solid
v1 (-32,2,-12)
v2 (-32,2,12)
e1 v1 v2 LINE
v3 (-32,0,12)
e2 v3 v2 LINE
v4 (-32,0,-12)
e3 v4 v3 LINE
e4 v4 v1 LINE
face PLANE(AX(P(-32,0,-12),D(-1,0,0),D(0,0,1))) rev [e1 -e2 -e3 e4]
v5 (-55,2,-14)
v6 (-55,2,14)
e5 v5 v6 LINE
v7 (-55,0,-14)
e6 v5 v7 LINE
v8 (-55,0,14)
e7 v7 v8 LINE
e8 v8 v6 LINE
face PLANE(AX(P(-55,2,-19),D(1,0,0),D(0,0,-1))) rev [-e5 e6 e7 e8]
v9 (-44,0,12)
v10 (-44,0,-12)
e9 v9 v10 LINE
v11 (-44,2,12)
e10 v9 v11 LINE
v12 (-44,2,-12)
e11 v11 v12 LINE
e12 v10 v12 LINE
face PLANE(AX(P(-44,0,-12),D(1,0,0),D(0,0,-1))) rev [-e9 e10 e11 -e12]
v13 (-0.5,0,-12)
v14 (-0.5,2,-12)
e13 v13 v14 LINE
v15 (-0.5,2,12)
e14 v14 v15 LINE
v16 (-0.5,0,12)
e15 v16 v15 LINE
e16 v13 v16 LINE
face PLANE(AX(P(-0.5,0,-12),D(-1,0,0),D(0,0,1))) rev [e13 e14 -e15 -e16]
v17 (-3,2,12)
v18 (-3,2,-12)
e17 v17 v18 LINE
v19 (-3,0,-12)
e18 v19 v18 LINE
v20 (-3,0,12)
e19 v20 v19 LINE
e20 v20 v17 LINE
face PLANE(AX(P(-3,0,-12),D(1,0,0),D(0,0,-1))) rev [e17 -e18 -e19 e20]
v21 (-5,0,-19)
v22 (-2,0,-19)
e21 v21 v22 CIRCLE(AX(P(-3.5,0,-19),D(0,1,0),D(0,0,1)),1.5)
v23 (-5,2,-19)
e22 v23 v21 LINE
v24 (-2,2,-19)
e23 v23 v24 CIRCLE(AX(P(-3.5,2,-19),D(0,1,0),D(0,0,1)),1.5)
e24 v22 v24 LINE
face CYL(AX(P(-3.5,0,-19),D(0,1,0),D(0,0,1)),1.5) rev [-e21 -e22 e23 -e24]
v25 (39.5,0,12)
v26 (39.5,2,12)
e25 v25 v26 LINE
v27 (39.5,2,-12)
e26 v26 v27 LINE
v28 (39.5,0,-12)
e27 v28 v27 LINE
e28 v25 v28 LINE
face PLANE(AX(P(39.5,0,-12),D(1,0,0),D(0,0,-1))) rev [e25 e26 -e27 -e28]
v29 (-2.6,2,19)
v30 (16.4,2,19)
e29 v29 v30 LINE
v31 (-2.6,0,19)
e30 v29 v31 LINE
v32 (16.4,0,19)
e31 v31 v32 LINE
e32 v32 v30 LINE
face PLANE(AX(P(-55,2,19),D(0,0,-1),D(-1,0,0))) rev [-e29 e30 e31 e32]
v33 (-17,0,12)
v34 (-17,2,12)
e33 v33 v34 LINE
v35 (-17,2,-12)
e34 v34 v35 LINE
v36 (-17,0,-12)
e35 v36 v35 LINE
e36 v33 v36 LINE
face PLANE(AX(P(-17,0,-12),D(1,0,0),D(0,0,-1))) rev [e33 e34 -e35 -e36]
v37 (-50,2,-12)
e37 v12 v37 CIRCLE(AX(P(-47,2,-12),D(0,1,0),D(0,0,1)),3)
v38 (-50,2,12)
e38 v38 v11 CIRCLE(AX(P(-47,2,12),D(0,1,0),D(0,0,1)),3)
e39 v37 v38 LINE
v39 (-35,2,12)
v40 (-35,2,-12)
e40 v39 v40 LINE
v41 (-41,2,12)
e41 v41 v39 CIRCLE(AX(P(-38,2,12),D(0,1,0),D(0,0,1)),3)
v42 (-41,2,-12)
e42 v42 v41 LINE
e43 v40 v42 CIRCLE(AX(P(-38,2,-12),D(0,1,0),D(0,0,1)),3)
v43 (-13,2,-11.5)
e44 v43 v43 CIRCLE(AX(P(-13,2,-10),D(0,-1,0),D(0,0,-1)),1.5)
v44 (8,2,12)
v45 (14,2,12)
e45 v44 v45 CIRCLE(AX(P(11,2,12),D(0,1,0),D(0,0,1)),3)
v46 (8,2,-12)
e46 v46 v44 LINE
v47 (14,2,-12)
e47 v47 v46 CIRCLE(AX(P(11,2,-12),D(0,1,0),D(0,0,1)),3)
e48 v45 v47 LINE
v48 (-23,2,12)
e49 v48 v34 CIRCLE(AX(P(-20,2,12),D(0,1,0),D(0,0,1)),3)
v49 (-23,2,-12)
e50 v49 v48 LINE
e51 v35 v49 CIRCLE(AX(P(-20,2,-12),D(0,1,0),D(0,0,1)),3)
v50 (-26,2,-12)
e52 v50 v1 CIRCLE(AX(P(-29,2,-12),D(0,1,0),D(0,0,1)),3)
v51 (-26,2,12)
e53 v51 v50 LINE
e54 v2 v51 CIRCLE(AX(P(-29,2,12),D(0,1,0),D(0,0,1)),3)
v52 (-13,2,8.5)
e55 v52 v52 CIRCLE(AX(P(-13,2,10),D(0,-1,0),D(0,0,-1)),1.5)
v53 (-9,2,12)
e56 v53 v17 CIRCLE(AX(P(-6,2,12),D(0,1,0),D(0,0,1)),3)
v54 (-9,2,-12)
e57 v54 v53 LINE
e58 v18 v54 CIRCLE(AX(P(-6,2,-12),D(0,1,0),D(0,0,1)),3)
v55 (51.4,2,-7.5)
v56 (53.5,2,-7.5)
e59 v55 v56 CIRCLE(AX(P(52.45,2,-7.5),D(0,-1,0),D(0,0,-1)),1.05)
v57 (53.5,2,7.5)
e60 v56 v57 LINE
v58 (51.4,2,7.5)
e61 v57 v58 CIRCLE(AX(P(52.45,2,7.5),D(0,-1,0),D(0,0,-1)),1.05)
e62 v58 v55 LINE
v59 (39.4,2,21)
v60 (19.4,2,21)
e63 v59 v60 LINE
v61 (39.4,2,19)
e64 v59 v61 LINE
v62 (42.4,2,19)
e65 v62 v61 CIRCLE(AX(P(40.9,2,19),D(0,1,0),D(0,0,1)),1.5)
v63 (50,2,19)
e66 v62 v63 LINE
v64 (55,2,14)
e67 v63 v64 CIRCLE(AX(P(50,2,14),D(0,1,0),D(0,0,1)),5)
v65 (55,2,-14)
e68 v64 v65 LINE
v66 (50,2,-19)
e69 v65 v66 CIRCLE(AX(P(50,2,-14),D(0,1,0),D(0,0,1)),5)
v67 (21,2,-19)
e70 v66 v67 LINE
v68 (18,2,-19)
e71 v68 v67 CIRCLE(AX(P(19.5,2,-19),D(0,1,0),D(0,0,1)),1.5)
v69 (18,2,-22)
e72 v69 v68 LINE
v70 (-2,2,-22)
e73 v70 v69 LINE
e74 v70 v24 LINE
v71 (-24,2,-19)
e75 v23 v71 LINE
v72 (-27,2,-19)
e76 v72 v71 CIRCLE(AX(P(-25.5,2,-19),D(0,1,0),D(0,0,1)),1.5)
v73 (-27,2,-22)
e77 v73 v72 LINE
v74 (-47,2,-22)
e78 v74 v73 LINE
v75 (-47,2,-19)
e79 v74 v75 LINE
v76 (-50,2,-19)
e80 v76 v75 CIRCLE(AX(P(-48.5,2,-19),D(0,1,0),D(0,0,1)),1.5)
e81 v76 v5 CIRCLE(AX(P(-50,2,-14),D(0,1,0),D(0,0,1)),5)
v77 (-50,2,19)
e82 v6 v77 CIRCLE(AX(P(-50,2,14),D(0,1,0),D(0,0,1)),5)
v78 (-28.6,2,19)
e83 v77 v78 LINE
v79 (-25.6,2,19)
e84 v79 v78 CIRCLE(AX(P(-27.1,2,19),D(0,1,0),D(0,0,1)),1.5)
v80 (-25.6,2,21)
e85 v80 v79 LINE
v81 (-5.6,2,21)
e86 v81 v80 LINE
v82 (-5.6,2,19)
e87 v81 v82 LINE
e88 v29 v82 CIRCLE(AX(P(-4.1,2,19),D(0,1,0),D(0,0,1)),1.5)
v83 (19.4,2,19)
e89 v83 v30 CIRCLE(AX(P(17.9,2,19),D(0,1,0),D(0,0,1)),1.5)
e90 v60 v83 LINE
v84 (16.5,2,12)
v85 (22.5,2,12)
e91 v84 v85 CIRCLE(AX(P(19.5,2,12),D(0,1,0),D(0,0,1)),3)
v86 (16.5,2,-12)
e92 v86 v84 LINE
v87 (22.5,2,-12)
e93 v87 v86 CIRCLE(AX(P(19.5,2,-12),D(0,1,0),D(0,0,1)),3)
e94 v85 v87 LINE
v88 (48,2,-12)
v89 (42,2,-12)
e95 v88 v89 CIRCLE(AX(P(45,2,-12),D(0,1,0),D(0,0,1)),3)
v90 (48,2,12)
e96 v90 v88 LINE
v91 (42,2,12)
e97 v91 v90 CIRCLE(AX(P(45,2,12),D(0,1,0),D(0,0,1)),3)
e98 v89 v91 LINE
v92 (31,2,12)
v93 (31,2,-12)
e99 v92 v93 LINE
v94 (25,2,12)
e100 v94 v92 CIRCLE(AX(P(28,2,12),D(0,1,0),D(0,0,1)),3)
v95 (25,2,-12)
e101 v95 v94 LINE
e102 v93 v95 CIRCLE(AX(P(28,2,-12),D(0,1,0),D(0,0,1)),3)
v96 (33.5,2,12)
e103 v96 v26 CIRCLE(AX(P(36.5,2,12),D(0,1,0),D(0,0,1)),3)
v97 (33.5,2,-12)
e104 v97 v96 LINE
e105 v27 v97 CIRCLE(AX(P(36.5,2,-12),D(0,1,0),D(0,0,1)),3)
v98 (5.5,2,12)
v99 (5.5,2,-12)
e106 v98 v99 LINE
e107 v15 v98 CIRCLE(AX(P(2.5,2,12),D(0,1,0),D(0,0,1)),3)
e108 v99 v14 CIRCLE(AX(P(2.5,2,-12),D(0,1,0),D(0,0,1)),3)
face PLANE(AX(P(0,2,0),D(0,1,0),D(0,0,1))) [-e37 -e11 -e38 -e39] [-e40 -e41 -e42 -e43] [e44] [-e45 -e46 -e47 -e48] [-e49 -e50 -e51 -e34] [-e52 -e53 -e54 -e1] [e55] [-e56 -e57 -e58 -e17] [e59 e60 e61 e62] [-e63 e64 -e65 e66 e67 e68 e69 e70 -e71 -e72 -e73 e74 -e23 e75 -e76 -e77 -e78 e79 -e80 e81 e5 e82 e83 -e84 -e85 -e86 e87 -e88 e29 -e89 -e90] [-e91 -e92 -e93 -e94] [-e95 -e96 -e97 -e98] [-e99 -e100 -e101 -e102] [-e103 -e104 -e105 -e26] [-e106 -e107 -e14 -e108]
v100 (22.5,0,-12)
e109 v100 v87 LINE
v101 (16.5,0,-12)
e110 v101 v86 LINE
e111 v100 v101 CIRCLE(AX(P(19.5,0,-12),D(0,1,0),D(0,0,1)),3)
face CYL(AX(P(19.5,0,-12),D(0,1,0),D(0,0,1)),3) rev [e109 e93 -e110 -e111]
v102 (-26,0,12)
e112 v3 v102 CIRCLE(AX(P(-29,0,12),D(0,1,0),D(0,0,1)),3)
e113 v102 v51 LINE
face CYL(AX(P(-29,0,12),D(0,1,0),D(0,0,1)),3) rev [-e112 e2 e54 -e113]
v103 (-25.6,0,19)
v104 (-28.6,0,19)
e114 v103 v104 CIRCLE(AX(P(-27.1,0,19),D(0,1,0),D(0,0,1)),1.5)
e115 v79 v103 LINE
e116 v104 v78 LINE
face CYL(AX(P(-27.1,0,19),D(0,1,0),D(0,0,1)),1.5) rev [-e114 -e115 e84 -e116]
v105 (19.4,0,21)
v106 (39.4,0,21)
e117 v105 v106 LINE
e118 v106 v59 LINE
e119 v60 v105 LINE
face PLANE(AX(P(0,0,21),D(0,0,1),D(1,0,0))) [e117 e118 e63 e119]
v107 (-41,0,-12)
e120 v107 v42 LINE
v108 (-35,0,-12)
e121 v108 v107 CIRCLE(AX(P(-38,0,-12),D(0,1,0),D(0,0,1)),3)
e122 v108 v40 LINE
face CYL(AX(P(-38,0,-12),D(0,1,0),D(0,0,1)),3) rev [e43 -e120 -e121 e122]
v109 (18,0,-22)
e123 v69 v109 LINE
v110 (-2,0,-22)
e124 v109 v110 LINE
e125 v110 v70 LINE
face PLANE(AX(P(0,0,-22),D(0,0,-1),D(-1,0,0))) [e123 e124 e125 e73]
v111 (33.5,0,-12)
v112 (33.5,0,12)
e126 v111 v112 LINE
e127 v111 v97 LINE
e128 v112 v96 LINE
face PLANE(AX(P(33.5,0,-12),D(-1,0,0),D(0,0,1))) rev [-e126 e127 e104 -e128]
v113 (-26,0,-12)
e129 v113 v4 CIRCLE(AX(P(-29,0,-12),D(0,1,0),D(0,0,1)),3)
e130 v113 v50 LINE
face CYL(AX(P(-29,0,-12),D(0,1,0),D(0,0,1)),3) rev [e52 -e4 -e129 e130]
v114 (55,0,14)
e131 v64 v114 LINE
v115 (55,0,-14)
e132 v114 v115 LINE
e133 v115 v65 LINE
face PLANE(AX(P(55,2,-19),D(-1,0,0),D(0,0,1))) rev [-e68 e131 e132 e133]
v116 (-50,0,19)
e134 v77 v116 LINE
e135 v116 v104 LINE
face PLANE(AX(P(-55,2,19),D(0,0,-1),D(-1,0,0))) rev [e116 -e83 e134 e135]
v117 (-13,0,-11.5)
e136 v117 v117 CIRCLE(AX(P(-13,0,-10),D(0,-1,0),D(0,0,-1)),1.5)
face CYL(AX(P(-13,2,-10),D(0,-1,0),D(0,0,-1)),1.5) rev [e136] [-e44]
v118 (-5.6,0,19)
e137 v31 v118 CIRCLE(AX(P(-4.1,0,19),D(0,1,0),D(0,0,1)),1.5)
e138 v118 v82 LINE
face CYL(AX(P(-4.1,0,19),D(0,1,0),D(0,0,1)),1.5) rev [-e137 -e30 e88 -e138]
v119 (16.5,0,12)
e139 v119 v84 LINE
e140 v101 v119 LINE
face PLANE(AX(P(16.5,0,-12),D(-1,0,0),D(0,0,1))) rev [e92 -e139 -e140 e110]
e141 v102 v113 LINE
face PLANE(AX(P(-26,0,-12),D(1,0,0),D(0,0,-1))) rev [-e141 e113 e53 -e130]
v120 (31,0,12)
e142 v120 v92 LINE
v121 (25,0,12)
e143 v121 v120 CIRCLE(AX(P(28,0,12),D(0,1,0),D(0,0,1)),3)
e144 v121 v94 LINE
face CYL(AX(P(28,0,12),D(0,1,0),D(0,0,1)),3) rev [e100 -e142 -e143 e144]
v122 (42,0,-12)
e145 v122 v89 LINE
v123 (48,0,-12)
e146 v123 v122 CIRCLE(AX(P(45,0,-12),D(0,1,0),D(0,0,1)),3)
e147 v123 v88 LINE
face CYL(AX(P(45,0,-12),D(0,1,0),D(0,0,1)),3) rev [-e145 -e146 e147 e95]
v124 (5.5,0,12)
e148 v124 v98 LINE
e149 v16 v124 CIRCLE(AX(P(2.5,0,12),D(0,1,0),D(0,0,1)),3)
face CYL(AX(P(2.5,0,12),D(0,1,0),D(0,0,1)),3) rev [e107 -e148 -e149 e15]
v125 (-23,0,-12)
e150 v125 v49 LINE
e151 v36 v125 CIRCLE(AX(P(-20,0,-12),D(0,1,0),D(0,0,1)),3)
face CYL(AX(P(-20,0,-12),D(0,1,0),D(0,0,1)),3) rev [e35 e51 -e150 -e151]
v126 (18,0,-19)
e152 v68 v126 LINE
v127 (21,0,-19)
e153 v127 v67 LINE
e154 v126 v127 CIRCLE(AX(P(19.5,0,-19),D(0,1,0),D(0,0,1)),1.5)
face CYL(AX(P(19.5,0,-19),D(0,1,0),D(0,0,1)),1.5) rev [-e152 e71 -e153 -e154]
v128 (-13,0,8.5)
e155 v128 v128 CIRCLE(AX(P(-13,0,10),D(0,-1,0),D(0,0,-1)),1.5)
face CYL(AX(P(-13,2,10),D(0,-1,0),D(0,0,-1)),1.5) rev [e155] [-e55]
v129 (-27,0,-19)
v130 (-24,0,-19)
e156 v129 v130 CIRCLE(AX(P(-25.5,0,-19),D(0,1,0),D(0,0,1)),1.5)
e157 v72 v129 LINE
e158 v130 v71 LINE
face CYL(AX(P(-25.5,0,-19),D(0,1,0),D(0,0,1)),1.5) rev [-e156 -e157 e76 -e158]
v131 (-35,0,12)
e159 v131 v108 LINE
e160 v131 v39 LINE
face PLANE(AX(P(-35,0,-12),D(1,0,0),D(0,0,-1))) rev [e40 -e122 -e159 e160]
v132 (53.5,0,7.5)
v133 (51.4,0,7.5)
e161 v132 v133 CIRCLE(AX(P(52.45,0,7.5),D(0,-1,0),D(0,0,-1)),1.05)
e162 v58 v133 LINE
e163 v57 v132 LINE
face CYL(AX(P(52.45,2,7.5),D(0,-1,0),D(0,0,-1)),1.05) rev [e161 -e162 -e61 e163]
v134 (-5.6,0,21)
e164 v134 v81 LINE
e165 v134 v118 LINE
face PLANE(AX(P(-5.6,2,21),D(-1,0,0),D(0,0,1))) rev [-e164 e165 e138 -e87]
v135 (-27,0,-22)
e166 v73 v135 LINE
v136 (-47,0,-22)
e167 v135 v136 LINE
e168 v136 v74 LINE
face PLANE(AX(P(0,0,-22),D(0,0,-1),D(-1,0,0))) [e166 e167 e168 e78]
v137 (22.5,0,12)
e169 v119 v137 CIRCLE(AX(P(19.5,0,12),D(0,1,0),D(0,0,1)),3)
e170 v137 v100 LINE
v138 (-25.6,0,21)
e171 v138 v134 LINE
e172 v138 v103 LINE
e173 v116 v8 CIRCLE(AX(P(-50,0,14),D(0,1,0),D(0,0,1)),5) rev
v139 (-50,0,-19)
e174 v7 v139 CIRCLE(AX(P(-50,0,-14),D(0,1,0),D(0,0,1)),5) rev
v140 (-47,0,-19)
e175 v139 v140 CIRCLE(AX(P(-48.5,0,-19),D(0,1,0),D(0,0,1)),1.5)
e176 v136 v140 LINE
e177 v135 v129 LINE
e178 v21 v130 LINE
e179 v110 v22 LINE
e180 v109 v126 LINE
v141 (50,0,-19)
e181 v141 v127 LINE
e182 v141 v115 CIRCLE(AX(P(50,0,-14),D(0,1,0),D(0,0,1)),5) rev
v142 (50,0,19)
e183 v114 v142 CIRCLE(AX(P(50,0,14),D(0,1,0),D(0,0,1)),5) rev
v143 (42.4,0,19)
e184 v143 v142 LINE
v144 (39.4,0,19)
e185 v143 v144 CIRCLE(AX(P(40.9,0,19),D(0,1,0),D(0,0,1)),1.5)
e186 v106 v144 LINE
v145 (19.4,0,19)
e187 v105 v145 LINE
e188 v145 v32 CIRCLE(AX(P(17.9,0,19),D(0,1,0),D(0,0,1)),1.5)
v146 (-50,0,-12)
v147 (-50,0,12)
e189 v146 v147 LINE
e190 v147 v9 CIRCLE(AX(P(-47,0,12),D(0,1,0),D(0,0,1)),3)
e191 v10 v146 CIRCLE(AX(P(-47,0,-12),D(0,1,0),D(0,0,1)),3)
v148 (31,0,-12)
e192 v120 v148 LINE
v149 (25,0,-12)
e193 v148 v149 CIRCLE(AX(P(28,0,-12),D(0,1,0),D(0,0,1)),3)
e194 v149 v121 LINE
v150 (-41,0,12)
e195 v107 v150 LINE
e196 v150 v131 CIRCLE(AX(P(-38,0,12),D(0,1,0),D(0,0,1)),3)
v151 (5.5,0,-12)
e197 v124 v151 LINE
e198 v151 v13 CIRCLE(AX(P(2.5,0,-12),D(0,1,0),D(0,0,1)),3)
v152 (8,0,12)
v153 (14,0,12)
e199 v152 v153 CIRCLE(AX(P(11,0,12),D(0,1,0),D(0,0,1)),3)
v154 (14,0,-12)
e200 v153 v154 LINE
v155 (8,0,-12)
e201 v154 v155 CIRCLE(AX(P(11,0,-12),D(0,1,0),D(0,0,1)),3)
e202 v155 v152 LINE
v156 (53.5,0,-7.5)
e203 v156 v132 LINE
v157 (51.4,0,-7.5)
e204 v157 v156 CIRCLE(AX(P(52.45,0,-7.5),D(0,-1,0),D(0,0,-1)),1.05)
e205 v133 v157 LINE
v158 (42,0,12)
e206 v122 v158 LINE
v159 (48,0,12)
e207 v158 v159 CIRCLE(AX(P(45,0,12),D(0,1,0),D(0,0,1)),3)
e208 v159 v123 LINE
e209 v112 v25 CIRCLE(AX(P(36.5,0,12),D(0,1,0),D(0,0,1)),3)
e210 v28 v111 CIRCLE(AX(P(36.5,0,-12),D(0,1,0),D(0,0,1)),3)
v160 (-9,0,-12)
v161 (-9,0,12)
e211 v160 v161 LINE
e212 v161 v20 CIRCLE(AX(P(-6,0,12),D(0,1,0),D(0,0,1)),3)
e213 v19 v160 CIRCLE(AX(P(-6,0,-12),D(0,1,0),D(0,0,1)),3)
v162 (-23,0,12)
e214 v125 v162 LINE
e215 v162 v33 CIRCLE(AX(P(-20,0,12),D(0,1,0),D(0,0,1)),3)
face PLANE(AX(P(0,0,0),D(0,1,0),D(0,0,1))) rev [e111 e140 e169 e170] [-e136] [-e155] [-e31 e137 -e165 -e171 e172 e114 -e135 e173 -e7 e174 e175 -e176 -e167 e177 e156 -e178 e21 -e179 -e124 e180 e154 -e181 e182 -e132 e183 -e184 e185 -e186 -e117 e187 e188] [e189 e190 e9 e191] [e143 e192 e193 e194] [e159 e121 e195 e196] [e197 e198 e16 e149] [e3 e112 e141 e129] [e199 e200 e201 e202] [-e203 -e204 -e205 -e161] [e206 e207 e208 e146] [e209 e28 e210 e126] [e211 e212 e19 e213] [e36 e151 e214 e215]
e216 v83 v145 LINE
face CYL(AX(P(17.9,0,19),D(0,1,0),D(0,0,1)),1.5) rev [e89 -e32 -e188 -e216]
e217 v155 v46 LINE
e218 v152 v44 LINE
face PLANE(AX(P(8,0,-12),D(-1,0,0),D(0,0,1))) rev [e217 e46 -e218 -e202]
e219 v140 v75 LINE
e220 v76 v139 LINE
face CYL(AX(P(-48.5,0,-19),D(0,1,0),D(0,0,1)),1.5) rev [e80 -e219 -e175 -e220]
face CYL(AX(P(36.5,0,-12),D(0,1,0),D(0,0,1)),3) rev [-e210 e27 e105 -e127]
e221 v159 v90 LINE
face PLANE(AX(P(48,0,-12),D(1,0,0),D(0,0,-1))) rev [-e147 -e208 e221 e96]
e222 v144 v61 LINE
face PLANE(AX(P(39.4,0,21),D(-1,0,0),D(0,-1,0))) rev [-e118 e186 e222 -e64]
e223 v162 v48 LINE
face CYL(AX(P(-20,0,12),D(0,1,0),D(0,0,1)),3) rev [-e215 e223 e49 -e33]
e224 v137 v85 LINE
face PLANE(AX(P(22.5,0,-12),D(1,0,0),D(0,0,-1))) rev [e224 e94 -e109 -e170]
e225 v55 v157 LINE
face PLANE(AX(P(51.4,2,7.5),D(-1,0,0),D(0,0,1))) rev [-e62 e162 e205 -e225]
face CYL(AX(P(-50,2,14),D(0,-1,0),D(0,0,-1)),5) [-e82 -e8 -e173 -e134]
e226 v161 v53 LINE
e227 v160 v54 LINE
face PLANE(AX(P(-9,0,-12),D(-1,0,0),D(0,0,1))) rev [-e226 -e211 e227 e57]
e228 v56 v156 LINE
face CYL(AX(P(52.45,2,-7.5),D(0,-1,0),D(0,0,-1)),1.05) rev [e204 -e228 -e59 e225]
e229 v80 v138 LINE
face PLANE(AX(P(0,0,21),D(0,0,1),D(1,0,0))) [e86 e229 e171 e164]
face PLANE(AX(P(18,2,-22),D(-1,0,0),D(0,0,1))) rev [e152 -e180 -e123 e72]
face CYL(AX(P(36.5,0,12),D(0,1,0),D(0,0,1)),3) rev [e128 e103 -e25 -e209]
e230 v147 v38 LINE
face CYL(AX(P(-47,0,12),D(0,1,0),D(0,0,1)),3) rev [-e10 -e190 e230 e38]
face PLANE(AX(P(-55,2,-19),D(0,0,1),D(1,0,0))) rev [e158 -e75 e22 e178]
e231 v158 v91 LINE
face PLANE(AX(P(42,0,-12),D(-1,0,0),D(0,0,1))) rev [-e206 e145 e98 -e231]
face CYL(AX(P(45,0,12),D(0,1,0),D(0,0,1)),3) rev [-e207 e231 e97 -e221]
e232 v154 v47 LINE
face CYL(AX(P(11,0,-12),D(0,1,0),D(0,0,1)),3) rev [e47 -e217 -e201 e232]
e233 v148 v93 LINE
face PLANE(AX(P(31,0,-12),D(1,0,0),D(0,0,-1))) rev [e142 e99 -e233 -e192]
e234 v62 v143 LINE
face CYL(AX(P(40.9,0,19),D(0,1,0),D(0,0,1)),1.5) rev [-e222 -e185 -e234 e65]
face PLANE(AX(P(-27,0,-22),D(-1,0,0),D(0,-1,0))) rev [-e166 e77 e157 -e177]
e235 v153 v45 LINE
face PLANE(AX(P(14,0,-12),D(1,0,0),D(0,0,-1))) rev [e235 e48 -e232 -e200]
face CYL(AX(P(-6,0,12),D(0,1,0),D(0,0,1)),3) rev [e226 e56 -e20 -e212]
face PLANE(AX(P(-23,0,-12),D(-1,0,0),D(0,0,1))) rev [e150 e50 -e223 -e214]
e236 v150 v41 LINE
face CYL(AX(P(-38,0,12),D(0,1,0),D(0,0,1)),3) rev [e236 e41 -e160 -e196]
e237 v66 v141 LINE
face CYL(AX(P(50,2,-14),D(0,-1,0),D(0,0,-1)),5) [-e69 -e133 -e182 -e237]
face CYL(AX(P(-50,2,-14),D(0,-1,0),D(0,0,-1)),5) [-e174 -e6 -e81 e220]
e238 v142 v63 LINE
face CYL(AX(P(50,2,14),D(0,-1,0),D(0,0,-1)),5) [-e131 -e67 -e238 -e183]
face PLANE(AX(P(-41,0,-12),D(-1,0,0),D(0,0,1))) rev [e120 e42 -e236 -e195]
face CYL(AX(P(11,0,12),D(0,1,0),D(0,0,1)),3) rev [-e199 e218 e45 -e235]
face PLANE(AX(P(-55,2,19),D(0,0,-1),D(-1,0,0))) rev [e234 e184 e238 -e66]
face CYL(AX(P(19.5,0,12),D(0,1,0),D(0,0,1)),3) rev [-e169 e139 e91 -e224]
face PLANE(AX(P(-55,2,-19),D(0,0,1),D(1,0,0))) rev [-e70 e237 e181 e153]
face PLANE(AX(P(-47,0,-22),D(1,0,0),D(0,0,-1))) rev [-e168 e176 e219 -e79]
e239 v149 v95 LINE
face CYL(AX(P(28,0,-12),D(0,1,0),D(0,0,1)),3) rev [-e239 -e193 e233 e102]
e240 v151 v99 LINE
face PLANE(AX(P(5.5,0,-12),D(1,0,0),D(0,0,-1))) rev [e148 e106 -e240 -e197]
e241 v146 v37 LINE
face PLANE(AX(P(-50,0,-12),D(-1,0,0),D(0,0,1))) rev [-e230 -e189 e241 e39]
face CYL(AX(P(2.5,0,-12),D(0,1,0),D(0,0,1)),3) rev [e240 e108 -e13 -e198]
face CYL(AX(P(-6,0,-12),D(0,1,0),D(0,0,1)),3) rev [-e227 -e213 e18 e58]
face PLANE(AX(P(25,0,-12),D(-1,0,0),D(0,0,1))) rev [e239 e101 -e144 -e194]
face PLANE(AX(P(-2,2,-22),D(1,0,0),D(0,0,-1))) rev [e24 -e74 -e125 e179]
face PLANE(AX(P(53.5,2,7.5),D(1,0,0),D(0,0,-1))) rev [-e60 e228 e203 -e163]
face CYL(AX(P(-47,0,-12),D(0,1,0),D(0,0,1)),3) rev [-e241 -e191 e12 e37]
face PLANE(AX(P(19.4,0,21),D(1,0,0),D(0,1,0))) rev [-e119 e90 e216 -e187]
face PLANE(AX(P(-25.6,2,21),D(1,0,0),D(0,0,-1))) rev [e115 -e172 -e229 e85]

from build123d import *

# Parameters (mm, degrees)
SKETCH_1_W          = 110
SKETCH_1_H          = 38
EXTRUDE_1_DEPTH     = 2
SKETCH_2_W          = 20
SKETCH_2_H          = 2
EXTRUDE_2_DEPTH     = 3
SKETCH_4_W          = 20
SKETCH_4_H          = 2
EXTRUDE_3_DEPTH     = 2
CUT_EXTRUDE_2_DEPTH = 60.270566051
SKETCH_7_R          = 1.5
CUT_EXTRUDE_4_DEPTH = 60.270566051
SKETCH_13_R         = 1.5
CUT_EXTRUDE_6_DEPTH = 60.270566051
FILLET_1_R          = 5
CUT_EXTRUDE_8_DEPTH = 60.270566051


with BuildPart() as part:
    # 草图1 → 凸台-拉伸1 (new body)
    with BuildSketch(Plane(origin=(0, 0, 0), x_dir=(1, 0, 0), z_dir=(0, 1, 0))):
        Rectangle(SKETCH_1_W, SKETCH_1_H)
    extrude(amount=EXTRUDE_1_DEPTH)

    # 草图2 → 凸台-拉伸2 (add)
    with BuildSketch(Plane(origin=(0, 0, -19), x_dir=(-1, 0, 0), z_dir=(0, 0, -1))):
        with Locations((-8, 1)):
            Rectangle(SKETCH_2_W, SKETCH_2_H)
        with Locations((37, 1)):
            Rectangle(SKETCH_2_W, SKETCH_2_H)
    extrude(amount=EXTRUDE_2_DEPTH)

    # 草图4 → 凸台-拉伸3 (add)
    with BuildSketch(Plane.XY.offset(19)):
        with Locations((-15.6, 1)):
            Rectangle(SKETCH_4_W, SKETCH_4_H)
        with Locations((29.4, 1)):
            Rectangle(SKETCH_4_W, SKETCH_4_H)
    extrude(amount=EXTRUDE_3_DEPTH)

    # 草图6 → 切除-拉伸2 (cut, through all)
    with BuildSketch(Plane.XZ):
        with BuildLine():
            Line((53.5, 7.5), (53.5, -7.5))
            ThreePointArc((53.5, -7.5), (52.45, -8.55), (51.4, -7.5))
            Line((51.4, -7.5), (51.4, 7.5))
            ThreePointArc((51.4, 7.5), (52.45, 8.55), (53.5, 7.5))
        make_face()
    extrude(amount=-CUT_EXTRUDE_2_DEPTH, mode=Mode.SUBTRACT)

    # 草图7 → 切除-拉伸4 (cut, through all)
    with BuildSketch(Plane.XZ):
        with Locations(Location((-13, -10, 0), (0, 0, 270))):
            Circle(SKETCH_7_R)
        with Locations(Location((-13, 10, 0), (0, 0, 270))):
            Circle(SKETCH_7_R)
    extrude(amount=-CUT_EXTRUDE_4_DEPTH, mode=Mode.SUBTRACT)

    # 草图13 → 切除-拉伸6 (cut, through all)
    with BuildSketch(Plane(origin=(0, 2, 0), x_dir=(1, 0, 0), z_dir=(0, 1, 0))):
        with Locations((-48.5, 19)):
            Circle(SKETCH_13_R)
        with Locations((-25.5, 19)):
            Circle(SKETCH_13_R)
        with Locations((-3.5, 19)):
            Circle(SKETCH_13_R)
        with Locations((19.5, 19)):
            Circle(SKETCH_13_R)
        with Locations((-27.1, -19)):
            Circle(SKETCH_13_R)
        with Locations((-4.1, -19)):
            Circle(SKETCH_13_R)
        with Locations((17.9, -19)):
            Circle(SKETCH_13_R)
        with Locations((40.9, -19)):
            Circle(SKETCH_13_R)
    extrude(amount=-CUT_EXTRUDE_6_DEPTH, mode=Mode.SUBTRACT)

    # 圆角1
    fillet_1_edges = [part.edges().sort_by_distance(p)[0] for p in [
        (55, 1, 19),
        (-55, 1, 19),
        (-55, 1, -19),
        (55, 1, -19),
    ]]
    fillet(fillet_1_edges, radius=FILLET_1_R - 0.0001)  # a hair under: the kernel refuses the full size

    # 草图12 → 切除-拉伸8 (cut, through all)
    with BuildSketch(Plane(origin=(0, 2, 0), x_dir=(1, 0, 0), z_dir=(0, 1, 0))):
        with BuildLine():
            Line((48, 12), (48, -12))
            ThreePointArc((48, -12), (45, -15), (42, -12))
            Line((42, -12), (42, 12))
            ThreePointArc((42, 12), (45, 15), (48, 12))
        make_face()
        with BuildLine():
            Line((39.5, 12), (39.5, -12))
            ThreePointArc((39.5, -12), (36.5, -15), (33.5, -12))
            Line((33.5, -12), (33.5, 12))
            ThreePointArc((33.5, 12), (36.5, 15), (39.5, 12))
        make_face()
        with BuildLine():
            Line((31, 12), (31, -12))
            ThreePointArc((31, -12), (28, -15), (25, -12))
            Line((25, -12), (25, 12))
            ThreePointArc((25, 12), (28, 15), (31, 12))
        make_face()
        with BuildLine():
            Line((22.5, 12), (22.5, -12))
            ThreePointArc((22.5, -12), (19.5, -15), (16.5, -12))
            Line((16.5, -12), (16.5, 12))
            ThreePointArc((16.5, 12), (19.5, 15), (22.5, 12))
        make_face()
        with BuildLine():
            Line((14, 12), (14, -12))
            ThreePointArc((14, -12), (11, -15), (8, -12))
            Line((8, -12), (8, 12))
            ThreePointArc((8, 12), (11, 15), (14, 12))
        make_face()
        with BuildLine():
            Line((5.5, 12), (5.5, -12))
            ThreePointArc((5.5, -12), (2.5, -15), (-0.5, -12))
            Line((-0.5, -12), (-0.5, 12))
            ThreePointArc((-0.5, 12), (2.5, 15), (5.5, 12))
        make_face()
        with BuildLine():
            Line((-3, 12), (-3, -12))
            ThreePointArc((-3, -12), (-6, -15), (-9, -12))
            Line((-9, -12), (-9, 12))
            ThreePointArc((-9, 12), (-6, 15), (-3, 12))
        make_face()
        with BuildLine():
            Line((-17, 12), (-17, -12))
            ThreePointArc((-17, -12), (-20, -15), (-23, -12))
            Line((-23, -12), (-23, 12))
            ThreePointArc((-23, 12), (-20, 15), (-17, 12))
        make_face()
        with BuildLine():
            Line((-26, 12), (-26, -12))
            ThreePointArc((-26, -12), (-29, -15), (-32, -12))
            Line((-32, -12), (-32, 12))
            ThreePointArc((-32, 12), (-29, 15), (-26, 12))
        make_face()
        with BuildLine():
            Line((-35, 12), (-35, -12))
            ThreePointArc((-35, -12), (-38, -15), (-41, -12))
            Line((-41, -12), (-41, 12))
            ThreePointArc((-41, 12), (-38, 15), (-35, 12))
        make_face()
        with BuildLine():
            Line((-44, 12), (-44, -12))
            ThreePointArc((-44, -12), (-47, -15), (-50, -12))
            Line((-50, -12), (-50, 12))
            ThreePointArc((-50, 12), (-47, 15), (-44, 12))
        make_face()
    extrude(amount=-CUT_EXTRUDE_8_DEPTH, mode=Mode.SUBTRACT)


solid = part.part
